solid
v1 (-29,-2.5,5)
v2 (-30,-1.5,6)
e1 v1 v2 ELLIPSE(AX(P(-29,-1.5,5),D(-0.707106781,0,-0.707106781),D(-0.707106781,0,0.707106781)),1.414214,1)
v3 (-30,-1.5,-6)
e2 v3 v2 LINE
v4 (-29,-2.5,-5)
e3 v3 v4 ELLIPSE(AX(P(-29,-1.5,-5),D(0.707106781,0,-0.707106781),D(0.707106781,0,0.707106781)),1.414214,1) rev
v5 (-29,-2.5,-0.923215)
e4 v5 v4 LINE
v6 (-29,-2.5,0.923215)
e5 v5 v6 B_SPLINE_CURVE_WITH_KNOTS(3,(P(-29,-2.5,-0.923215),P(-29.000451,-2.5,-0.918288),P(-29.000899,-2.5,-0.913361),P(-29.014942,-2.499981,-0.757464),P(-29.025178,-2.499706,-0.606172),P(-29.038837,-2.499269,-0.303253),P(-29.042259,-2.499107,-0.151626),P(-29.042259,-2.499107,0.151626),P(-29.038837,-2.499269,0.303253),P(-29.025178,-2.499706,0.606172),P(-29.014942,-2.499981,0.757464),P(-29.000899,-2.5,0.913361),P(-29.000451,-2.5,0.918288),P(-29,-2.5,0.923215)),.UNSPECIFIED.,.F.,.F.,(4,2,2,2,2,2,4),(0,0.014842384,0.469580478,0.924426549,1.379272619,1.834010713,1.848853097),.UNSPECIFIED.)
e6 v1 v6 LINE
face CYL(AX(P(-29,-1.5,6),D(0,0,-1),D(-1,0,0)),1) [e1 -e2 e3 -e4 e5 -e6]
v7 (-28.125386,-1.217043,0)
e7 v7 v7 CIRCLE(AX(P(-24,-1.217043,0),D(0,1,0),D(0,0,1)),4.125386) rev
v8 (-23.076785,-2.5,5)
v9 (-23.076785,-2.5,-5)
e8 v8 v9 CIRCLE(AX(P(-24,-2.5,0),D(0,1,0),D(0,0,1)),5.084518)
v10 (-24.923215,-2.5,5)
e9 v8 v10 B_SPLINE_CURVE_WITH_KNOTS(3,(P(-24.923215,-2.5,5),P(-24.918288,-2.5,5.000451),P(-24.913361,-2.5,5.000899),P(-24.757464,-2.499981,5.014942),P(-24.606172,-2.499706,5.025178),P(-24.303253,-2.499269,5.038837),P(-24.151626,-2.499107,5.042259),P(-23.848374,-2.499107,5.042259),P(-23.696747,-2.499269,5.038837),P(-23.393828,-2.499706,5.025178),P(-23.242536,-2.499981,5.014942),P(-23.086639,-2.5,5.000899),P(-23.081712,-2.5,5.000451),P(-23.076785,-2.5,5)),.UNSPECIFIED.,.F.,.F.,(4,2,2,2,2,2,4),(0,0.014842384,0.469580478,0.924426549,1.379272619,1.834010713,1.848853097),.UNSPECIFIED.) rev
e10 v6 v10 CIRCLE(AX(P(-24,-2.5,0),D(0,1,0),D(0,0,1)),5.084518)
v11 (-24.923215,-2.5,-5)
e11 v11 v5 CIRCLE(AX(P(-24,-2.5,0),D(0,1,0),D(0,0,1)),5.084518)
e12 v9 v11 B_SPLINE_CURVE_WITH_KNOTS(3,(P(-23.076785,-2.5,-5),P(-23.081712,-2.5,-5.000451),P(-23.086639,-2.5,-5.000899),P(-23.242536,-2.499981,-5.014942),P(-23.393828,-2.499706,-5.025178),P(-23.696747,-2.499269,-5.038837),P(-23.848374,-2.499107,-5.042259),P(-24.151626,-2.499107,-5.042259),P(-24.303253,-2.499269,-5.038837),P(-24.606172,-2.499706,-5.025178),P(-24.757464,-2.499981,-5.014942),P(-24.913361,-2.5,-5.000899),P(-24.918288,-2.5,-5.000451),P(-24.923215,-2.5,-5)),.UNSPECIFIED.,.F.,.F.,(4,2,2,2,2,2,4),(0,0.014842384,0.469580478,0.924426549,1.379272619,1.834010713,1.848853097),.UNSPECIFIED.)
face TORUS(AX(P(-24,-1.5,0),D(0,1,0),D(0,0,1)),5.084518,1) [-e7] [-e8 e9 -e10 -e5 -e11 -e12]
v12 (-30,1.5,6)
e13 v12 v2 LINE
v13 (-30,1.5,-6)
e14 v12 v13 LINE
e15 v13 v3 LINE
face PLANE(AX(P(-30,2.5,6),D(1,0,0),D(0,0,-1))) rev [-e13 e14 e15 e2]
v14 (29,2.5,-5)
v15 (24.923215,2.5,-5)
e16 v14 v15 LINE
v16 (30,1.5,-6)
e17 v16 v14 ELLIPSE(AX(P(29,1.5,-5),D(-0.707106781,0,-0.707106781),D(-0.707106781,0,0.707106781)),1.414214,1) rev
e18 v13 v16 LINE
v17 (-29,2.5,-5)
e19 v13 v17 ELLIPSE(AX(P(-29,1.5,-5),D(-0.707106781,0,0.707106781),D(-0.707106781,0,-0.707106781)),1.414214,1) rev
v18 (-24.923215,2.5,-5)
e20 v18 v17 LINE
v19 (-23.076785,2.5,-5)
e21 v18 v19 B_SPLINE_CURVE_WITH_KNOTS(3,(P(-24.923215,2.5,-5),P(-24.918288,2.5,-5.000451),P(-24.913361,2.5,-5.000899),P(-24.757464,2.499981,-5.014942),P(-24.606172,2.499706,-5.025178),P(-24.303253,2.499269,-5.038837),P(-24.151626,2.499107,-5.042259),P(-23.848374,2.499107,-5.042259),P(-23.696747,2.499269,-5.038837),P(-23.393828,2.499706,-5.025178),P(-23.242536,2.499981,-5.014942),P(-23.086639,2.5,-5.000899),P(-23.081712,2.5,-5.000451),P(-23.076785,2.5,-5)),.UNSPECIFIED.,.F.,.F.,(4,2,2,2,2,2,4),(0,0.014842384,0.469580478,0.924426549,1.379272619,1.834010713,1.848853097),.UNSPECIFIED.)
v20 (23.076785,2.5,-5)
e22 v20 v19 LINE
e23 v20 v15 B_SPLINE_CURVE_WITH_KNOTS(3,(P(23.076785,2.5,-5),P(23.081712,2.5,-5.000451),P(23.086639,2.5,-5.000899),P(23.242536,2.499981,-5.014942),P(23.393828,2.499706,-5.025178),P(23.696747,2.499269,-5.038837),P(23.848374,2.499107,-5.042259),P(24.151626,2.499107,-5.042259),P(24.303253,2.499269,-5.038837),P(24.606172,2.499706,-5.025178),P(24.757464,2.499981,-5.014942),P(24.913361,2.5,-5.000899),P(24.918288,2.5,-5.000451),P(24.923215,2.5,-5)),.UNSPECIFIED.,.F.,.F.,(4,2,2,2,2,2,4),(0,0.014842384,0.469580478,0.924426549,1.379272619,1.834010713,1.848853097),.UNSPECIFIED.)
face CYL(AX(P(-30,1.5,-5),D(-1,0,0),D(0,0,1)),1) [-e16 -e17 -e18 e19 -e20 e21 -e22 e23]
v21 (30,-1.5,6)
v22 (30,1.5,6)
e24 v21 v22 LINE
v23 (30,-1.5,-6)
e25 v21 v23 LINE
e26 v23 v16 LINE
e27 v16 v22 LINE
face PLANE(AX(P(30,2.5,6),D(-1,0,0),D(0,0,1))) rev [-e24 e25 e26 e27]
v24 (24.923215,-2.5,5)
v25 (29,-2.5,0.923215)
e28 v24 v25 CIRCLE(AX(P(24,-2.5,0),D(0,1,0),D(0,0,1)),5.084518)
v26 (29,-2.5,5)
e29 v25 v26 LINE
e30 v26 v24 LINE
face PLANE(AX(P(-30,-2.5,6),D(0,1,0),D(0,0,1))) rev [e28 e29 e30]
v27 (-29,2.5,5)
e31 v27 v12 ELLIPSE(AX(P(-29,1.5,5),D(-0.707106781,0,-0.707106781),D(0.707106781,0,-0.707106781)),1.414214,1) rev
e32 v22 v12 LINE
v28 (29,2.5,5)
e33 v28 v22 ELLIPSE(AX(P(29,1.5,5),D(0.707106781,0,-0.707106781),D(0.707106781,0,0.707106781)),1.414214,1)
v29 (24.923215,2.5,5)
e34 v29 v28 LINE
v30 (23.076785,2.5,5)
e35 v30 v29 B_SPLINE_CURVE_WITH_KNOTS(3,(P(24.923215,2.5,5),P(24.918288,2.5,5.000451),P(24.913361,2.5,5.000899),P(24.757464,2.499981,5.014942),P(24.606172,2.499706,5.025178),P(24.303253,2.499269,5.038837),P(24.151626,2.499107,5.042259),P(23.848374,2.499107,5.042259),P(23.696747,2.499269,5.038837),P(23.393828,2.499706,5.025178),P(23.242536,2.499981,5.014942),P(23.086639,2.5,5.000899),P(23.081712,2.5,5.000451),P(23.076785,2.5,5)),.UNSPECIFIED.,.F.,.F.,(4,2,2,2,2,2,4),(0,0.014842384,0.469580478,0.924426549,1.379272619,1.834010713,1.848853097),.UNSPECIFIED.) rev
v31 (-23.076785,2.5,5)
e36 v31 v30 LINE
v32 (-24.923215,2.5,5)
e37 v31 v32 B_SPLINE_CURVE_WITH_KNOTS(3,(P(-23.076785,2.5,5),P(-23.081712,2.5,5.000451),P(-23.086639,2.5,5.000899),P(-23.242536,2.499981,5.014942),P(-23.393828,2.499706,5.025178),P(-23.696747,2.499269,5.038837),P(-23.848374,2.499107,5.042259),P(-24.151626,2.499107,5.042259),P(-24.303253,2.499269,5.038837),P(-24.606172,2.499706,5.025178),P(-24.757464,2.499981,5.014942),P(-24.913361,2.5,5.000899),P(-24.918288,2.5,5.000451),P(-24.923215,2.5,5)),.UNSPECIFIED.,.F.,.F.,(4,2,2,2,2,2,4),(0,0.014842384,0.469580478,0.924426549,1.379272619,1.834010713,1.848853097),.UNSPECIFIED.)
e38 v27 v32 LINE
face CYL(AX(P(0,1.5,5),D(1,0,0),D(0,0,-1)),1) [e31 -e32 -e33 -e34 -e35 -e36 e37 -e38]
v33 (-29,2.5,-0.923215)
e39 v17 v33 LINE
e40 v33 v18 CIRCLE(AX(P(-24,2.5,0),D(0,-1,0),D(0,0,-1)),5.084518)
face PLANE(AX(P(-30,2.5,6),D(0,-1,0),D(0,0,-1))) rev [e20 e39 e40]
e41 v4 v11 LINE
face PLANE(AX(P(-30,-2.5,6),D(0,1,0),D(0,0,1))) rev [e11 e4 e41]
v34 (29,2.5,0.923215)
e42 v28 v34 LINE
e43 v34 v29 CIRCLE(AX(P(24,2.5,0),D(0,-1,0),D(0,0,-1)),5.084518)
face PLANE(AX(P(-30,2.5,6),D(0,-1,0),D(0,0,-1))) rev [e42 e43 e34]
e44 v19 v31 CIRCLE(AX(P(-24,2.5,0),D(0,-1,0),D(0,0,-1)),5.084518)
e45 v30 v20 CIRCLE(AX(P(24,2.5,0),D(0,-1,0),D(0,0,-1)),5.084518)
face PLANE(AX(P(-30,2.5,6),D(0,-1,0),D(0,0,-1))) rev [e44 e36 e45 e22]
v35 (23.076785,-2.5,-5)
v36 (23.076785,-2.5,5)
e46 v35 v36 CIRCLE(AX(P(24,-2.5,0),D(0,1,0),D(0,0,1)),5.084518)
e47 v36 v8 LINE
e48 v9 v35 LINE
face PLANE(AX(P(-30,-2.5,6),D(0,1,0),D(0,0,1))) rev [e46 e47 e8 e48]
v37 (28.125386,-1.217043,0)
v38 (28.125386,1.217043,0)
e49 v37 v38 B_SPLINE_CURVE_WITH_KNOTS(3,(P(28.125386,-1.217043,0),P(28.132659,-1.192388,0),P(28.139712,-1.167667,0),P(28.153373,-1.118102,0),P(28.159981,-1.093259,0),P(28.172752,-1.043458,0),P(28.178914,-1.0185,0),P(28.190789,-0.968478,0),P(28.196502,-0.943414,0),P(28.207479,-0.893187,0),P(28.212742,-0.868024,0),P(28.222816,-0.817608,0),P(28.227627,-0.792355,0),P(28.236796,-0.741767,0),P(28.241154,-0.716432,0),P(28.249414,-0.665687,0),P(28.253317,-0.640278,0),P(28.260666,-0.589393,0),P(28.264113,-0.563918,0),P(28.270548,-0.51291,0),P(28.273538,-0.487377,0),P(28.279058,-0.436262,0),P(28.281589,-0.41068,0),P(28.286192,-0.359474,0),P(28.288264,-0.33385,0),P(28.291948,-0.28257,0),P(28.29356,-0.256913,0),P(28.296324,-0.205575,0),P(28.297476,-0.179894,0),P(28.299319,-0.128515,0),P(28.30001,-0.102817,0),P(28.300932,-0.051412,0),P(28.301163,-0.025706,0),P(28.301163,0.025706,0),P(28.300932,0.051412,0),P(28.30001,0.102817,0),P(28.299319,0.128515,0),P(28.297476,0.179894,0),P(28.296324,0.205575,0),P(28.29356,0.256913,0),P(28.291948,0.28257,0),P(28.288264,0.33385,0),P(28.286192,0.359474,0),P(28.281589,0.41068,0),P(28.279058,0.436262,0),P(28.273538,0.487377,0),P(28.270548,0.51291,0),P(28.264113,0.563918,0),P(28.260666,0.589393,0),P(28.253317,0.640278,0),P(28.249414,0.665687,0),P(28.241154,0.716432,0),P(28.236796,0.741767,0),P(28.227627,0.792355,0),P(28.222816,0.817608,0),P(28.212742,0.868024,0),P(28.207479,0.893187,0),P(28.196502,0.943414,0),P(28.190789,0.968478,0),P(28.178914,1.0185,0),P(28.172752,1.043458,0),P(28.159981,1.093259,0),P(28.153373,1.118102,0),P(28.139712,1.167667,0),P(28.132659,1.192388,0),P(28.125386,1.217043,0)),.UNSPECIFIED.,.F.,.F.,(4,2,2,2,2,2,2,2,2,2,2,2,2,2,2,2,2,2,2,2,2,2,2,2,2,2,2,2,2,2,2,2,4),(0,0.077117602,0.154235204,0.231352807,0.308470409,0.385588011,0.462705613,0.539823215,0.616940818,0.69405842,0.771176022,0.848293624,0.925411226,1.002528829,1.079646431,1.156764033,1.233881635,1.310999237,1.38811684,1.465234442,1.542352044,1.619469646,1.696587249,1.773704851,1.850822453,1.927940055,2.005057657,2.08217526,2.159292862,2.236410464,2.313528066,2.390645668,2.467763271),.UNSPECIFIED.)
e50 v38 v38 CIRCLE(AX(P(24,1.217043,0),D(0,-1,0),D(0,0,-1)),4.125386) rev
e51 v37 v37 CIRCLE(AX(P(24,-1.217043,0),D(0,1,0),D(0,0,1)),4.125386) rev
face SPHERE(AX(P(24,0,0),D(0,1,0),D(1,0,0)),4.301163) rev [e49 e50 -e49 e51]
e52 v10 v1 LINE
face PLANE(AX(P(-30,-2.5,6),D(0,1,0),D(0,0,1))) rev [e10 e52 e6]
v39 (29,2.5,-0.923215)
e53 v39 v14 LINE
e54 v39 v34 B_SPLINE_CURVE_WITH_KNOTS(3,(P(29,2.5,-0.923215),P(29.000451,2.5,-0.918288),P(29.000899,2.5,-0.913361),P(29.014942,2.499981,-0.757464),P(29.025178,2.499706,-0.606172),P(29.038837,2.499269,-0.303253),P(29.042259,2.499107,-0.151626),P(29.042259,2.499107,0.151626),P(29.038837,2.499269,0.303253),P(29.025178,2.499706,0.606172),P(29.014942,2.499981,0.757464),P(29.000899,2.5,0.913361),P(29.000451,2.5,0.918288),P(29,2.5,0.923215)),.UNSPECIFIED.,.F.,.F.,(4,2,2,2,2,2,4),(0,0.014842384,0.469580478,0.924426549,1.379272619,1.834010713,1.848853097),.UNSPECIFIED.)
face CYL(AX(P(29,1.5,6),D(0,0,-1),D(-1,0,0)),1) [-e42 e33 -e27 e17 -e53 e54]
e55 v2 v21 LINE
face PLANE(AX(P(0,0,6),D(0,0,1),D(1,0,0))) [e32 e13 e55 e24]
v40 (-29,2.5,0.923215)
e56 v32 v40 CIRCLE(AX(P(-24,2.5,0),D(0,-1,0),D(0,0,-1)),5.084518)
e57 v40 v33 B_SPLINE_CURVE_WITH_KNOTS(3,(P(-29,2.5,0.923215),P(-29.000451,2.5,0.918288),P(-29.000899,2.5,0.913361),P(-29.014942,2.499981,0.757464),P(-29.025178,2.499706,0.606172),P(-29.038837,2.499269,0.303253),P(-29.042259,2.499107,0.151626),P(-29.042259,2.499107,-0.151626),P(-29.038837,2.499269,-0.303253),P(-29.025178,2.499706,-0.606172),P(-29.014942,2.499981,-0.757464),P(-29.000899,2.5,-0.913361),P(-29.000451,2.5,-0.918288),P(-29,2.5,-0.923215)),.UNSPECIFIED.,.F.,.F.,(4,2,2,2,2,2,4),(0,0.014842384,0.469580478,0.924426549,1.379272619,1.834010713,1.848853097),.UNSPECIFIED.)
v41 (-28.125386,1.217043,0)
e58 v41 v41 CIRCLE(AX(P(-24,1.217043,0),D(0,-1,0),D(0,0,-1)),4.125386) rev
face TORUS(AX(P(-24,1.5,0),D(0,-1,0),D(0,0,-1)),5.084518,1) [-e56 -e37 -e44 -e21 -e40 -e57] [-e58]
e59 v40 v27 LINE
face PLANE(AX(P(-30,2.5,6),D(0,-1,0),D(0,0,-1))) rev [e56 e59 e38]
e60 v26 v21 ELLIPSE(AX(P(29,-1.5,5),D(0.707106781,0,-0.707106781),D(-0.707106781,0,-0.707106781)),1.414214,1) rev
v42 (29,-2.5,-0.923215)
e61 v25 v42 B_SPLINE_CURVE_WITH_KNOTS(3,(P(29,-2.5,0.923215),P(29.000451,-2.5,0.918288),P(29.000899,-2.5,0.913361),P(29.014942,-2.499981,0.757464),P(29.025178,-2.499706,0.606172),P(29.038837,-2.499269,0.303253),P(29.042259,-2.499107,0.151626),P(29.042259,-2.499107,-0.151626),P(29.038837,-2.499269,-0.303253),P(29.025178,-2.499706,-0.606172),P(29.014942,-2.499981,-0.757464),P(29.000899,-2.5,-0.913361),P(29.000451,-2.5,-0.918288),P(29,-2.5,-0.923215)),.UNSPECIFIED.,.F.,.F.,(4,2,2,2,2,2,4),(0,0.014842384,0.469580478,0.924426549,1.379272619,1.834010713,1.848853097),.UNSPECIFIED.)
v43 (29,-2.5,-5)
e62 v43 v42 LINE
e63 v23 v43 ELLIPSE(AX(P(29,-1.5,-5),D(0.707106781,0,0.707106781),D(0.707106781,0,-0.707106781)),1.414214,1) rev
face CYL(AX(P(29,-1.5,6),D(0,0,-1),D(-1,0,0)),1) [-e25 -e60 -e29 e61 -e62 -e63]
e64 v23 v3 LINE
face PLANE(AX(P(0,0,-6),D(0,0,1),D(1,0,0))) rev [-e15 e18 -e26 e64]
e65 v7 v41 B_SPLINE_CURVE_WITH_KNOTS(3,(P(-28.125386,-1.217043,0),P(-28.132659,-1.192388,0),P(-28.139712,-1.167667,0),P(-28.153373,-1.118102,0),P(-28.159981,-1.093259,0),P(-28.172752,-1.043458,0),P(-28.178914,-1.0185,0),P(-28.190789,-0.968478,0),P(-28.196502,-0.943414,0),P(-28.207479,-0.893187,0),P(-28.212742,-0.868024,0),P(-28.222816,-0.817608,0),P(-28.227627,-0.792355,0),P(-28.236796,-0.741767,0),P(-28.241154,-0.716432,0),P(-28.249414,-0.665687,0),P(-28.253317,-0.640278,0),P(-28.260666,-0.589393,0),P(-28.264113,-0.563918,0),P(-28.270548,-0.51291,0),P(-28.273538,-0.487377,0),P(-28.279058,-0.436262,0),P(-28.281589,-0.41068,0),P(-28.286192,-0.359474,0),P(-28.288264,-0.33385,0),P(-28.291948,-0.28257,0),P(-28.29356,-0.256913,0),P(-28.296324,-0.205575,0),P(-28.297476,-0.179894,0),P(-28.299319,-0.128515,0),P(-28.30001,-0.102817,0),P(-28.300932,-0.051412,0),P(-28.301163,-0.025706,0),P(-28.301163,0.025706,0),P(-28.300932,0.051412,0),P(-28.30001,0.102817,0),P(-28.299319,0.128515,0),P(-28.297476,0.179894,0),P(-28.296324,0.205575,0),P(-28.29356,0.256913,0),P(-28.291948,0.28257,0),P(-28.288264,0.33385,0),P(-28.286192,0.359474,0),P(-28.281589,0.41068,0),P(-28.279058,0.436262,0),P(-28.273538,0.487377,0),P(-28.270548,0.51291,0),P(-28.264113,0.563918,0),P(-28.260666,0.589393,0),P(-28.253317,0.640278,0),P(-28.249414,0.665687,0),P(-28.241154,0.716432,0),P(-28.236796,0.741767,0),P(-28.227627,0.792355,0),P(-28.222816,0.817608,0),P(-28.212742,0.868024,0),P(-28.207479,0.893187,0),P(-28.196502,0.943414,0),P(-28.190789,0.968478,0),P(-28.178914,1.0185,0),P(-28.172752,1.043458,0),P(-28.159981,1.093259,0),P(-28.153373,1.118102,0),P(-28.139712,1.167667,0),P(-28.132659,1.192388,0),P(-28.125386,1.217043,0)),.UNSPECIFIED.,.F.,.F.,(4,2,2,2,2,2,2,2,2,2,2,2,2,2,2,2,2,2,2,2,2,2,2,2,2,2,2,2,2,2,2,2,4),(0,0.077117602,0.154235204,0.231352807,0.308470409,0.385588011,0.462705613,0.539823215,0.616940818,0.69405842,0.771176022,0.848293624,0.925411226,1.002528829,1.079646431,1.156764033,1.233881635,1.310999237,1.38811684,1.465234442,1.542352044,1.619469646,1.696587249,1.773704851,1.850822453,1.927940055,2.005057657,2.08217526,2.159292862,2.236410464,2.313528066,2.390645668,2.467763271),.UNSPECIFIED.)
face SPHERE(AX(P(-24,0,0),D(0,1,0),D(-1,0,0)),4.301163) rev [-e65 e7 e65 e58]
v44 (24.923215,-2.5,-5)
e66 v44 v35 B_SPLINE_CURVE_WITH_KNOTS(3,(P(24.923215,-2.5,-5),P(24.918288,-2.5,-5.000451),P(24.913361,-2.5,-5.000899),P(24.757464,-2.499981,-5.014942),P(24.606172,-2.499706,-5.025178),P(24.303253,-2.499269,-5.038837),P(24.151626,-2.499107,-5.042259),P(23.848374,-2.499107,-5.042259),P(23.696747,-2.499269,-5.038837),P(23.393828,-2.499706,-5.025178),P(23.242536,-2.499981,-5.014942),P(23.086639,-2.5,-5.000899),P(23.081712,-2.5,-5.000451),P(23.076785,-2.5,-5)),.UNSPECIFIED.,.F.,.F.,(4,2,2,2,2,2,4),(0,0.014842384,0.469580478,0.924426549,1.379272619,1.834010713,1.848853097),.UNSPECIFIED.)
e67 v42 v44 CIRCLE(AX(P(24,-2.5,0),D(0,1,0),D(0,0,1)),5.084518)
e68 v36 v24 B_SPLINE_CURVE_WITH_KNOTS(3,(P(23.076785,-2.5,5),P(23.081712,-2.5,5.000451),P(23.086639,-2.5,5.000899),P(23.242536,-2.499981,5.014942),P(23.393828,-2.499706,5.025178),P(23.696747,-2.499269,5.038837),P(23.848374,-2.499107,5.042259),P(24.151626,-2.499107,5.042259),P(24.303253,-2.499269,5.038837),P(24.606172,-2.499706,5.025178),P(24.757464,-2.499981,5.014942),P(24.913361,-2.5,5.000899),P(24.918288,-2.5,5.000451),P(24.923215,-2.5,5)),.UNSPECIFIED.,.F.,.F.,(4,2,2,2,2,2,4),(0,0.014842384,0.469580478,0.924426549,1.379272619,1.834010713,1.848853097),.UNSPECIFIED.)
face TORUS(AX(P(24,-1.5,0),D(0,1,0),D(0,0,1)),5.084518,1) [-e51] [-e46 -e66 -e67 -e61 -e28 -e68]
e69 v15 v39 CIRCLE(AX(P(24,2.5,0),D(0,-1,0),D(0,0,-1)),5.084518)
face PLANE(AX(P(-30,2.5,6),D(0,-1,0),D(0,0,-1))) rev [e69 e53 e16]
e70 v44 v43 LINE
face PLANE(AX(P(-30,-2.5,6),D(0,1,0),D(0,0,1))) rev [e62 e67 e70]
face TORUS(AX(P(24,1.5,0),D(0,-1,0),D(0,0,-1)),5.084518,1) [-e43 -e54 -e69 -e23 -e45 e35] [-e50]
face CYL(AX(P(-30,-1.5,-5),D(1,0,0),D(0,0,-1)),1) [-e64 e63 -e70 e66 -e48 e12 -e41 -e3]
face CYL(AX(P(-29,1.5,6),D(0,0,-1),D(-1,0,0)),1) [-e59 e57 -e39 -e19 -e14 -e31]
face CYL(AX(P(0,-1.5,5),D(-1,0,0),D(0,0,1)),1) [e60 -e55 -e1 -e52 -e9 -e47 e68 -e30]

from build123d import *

# Parameters (mm, degrees)
SKETCH1_W           = 60
SKETCH1_H           = 5
BOSS_EXTRUDE1_DEPTH = 6
FILLET1_R           = 1


with BuildPart() as part:
    # Sketch1 → Boss-Extrude1 (new, symmetric)
    with BuildSketch(Plane.XY):
        Rectangle(SKETCH1_W, SKETCH1_H)
    extrude(amount=BOSS_EXTRUDE1_DEPTH, both=True)

    # Sketch2 → Cut-Revolve1 (revolve, cut)
    with BuildSketch(Plane.XY):
        with BuildLine():
            Line((-24, 2.5), (-24, -2.5))
            Line((-24, -2.5), (-27.5, -2.5))
            ThreePointArc((-27.5, -2.5), (-28.301162634, 0), (-27.5, 2.5))
            Line((-27.5, 2.5), (-24, 2.5))
        make_face()
    cut_revolve1 = revolve(axis=Axis((-24, 2.5, 0), (0, -1, 0)), mode=Mode.SUBTRACT)

    # Mirror1: Cut-Revolve1 across plane
    add(cut_revolve1.mirror(Plane(origin=(0, 0, 0), x_dir=(0, 0, 1), z_dir=(1, 0, 0))), mode=Mode.SUBTRACT)

    # Fillet1
    # the kernel refuses this fillet: 1 mm, written as the material it takes off along each edge
    with BuildSketch(Plane(origin=(-24, 2.5, 0), x_dir=(-1, 0, 0), z_dir=(0, 0, 1))) as fillet1_piece_1:
        with BuildLine():
            CenterArc((5.084518194, 1), FILLET1_R, 163.563244845, 106.436755155)
            ThreePointArc((4.125385539, 1.282956797), (3.866279955, 0.615356981), (3.5, 0))
            Line((3.5, 0), (5.084518194, 0))
        make_face()
    revolve(axis=Axis((-24, 2.5, 0), (0, -1, 0)), mode=Mode.SUBTRACT)
    with BuildSketch(Plane(origin=(-24, -2.5, 0), x_dir=(-1, 0, 0), z_dir=(0, 0, 1))) as fillet1_piece_2:
        with BuildLine():
            CenterArc((5.084518194, -1), FILLET1_R, 90, 106.436755155)
            Line((5.084518194, 0), (3.5, 0))
            ThreePointArc((3.5, 0), (3.866279955, -0.615356981), (4.125385539, -1.282956797))
        make_face()
    revolve(axis=Axis((-24, -2.5, 0), (0, -1, 0)), mode=Mode.SUBTRACT)
    with BuildSketch(Plane(origin=(32.5, -2.5, 6), x_dir=(0, 1, 0), z_dir=(-1, 0, 0)), Plane(origin=(-32.5, 2.5, -6), x_dir=(0, 0, 1), z_dir=(1, 0, 0))) as fillet1_piece_3:
        with BuildLine():
            CenterArc((FILLET1_R, FILLET1_R), FILLET1_R, 180, 90)
            Line((0, FILLET1_R), (0, 0))
            Line((0, 0), (FILLET1_R, 0))
        make_face()
    extrude(amount=65, mode=Mode.SUBTRACT)
    with BuildSketch(Plane(origin=(24, 2.5, 0), x_dir=(1, 0, 0), z_dir=(0, 0, 1))) as fillet1_piece_4:
        with BuildLine():
            CenterArc((5.084518194, -1), FILLET1_R, 90, 106.436755155)
            ThreePointArc((4.125385539, -1.282956797), (3.866279955, -0.615356981), (3.5, 0))
            Line((3.5, 0), (5.084518194, 0))
        make_face()
    revolve(axis=Axis((24, 2.5, 0), (0, 1, 0)), mode=Mode.SUBTRACT)
    with BuildSketch(Plane(origin=(24, -2.5, 0), x_dir=(1, 0, 0), z_dir=(0, 0, 1))) as fillet1_piece_5:
        with BuildLine():
            CenterArc((5.084518194, 1), FILLET1_R, 163.563244845, 106.436755155)
            Line((5.084518194, 0), (3.5, 0))
            ThreePointArc((3.5, 0), (3.866279955, 0.615356981), (4.125385539, 1.282956797))
        make_face()
    revolve(axis=Axis((24, -2.5, 0), (0, 1, 0)), mode=Mode.SUBTRACT)
    with BuildSketch(Plane(origin=(32.5, -2.5, -6), x_dir=(0, 1, 0), z_dir=(-1, 0, 0)), Plane(origin=(-32.5, 2.5, 6), x_dir=(0, 0, -1), z_dir=(1, 0, 0))) as fillet1_piece_6:
        with BuildLine():
            CenterArc((FILLET1_R, -FILLET1_R), FILLET1_R, 90, 90)
            Line((0, -FILLET1_R), (0, 0))
            Line((0, 0), (FILLET1_R, 0))
        make_face()
    extrude(amount=65, mode=Mode.SUBTRACT)
    with BuildSketch(Plane(origin=(30, -2.5, 8.5), x_dir=(0, 1, 0), z_dir=(0, 0, -1)), Plane(origin=(-30, -2.5, -8.5), x_dir=(0, 1, 0), z_dir=(0, 0, 1)), Plane(origin=(-30, 2.5, -8.5), x_dir=(1, 0, 0), z_dir=(0, 0, 1)), Plane(origin=(30, 2.5, 8.5), x_dir=(-1, 0, 0), z_dir=(0, 0, -1))) as fillet1_piece_7:
        with BuildLine():
            CenterArc((FILLET1_R, -FILLET1_R), FILLET1_R, 90, 90)
            Line((0, -FILLET1_R), (0, 0))
            Line((0, 0), (FILLET1_R, 0))
        make_face()
    extrude(amount=17, mode=Mode.SUBTRACT)


solid = part.part
